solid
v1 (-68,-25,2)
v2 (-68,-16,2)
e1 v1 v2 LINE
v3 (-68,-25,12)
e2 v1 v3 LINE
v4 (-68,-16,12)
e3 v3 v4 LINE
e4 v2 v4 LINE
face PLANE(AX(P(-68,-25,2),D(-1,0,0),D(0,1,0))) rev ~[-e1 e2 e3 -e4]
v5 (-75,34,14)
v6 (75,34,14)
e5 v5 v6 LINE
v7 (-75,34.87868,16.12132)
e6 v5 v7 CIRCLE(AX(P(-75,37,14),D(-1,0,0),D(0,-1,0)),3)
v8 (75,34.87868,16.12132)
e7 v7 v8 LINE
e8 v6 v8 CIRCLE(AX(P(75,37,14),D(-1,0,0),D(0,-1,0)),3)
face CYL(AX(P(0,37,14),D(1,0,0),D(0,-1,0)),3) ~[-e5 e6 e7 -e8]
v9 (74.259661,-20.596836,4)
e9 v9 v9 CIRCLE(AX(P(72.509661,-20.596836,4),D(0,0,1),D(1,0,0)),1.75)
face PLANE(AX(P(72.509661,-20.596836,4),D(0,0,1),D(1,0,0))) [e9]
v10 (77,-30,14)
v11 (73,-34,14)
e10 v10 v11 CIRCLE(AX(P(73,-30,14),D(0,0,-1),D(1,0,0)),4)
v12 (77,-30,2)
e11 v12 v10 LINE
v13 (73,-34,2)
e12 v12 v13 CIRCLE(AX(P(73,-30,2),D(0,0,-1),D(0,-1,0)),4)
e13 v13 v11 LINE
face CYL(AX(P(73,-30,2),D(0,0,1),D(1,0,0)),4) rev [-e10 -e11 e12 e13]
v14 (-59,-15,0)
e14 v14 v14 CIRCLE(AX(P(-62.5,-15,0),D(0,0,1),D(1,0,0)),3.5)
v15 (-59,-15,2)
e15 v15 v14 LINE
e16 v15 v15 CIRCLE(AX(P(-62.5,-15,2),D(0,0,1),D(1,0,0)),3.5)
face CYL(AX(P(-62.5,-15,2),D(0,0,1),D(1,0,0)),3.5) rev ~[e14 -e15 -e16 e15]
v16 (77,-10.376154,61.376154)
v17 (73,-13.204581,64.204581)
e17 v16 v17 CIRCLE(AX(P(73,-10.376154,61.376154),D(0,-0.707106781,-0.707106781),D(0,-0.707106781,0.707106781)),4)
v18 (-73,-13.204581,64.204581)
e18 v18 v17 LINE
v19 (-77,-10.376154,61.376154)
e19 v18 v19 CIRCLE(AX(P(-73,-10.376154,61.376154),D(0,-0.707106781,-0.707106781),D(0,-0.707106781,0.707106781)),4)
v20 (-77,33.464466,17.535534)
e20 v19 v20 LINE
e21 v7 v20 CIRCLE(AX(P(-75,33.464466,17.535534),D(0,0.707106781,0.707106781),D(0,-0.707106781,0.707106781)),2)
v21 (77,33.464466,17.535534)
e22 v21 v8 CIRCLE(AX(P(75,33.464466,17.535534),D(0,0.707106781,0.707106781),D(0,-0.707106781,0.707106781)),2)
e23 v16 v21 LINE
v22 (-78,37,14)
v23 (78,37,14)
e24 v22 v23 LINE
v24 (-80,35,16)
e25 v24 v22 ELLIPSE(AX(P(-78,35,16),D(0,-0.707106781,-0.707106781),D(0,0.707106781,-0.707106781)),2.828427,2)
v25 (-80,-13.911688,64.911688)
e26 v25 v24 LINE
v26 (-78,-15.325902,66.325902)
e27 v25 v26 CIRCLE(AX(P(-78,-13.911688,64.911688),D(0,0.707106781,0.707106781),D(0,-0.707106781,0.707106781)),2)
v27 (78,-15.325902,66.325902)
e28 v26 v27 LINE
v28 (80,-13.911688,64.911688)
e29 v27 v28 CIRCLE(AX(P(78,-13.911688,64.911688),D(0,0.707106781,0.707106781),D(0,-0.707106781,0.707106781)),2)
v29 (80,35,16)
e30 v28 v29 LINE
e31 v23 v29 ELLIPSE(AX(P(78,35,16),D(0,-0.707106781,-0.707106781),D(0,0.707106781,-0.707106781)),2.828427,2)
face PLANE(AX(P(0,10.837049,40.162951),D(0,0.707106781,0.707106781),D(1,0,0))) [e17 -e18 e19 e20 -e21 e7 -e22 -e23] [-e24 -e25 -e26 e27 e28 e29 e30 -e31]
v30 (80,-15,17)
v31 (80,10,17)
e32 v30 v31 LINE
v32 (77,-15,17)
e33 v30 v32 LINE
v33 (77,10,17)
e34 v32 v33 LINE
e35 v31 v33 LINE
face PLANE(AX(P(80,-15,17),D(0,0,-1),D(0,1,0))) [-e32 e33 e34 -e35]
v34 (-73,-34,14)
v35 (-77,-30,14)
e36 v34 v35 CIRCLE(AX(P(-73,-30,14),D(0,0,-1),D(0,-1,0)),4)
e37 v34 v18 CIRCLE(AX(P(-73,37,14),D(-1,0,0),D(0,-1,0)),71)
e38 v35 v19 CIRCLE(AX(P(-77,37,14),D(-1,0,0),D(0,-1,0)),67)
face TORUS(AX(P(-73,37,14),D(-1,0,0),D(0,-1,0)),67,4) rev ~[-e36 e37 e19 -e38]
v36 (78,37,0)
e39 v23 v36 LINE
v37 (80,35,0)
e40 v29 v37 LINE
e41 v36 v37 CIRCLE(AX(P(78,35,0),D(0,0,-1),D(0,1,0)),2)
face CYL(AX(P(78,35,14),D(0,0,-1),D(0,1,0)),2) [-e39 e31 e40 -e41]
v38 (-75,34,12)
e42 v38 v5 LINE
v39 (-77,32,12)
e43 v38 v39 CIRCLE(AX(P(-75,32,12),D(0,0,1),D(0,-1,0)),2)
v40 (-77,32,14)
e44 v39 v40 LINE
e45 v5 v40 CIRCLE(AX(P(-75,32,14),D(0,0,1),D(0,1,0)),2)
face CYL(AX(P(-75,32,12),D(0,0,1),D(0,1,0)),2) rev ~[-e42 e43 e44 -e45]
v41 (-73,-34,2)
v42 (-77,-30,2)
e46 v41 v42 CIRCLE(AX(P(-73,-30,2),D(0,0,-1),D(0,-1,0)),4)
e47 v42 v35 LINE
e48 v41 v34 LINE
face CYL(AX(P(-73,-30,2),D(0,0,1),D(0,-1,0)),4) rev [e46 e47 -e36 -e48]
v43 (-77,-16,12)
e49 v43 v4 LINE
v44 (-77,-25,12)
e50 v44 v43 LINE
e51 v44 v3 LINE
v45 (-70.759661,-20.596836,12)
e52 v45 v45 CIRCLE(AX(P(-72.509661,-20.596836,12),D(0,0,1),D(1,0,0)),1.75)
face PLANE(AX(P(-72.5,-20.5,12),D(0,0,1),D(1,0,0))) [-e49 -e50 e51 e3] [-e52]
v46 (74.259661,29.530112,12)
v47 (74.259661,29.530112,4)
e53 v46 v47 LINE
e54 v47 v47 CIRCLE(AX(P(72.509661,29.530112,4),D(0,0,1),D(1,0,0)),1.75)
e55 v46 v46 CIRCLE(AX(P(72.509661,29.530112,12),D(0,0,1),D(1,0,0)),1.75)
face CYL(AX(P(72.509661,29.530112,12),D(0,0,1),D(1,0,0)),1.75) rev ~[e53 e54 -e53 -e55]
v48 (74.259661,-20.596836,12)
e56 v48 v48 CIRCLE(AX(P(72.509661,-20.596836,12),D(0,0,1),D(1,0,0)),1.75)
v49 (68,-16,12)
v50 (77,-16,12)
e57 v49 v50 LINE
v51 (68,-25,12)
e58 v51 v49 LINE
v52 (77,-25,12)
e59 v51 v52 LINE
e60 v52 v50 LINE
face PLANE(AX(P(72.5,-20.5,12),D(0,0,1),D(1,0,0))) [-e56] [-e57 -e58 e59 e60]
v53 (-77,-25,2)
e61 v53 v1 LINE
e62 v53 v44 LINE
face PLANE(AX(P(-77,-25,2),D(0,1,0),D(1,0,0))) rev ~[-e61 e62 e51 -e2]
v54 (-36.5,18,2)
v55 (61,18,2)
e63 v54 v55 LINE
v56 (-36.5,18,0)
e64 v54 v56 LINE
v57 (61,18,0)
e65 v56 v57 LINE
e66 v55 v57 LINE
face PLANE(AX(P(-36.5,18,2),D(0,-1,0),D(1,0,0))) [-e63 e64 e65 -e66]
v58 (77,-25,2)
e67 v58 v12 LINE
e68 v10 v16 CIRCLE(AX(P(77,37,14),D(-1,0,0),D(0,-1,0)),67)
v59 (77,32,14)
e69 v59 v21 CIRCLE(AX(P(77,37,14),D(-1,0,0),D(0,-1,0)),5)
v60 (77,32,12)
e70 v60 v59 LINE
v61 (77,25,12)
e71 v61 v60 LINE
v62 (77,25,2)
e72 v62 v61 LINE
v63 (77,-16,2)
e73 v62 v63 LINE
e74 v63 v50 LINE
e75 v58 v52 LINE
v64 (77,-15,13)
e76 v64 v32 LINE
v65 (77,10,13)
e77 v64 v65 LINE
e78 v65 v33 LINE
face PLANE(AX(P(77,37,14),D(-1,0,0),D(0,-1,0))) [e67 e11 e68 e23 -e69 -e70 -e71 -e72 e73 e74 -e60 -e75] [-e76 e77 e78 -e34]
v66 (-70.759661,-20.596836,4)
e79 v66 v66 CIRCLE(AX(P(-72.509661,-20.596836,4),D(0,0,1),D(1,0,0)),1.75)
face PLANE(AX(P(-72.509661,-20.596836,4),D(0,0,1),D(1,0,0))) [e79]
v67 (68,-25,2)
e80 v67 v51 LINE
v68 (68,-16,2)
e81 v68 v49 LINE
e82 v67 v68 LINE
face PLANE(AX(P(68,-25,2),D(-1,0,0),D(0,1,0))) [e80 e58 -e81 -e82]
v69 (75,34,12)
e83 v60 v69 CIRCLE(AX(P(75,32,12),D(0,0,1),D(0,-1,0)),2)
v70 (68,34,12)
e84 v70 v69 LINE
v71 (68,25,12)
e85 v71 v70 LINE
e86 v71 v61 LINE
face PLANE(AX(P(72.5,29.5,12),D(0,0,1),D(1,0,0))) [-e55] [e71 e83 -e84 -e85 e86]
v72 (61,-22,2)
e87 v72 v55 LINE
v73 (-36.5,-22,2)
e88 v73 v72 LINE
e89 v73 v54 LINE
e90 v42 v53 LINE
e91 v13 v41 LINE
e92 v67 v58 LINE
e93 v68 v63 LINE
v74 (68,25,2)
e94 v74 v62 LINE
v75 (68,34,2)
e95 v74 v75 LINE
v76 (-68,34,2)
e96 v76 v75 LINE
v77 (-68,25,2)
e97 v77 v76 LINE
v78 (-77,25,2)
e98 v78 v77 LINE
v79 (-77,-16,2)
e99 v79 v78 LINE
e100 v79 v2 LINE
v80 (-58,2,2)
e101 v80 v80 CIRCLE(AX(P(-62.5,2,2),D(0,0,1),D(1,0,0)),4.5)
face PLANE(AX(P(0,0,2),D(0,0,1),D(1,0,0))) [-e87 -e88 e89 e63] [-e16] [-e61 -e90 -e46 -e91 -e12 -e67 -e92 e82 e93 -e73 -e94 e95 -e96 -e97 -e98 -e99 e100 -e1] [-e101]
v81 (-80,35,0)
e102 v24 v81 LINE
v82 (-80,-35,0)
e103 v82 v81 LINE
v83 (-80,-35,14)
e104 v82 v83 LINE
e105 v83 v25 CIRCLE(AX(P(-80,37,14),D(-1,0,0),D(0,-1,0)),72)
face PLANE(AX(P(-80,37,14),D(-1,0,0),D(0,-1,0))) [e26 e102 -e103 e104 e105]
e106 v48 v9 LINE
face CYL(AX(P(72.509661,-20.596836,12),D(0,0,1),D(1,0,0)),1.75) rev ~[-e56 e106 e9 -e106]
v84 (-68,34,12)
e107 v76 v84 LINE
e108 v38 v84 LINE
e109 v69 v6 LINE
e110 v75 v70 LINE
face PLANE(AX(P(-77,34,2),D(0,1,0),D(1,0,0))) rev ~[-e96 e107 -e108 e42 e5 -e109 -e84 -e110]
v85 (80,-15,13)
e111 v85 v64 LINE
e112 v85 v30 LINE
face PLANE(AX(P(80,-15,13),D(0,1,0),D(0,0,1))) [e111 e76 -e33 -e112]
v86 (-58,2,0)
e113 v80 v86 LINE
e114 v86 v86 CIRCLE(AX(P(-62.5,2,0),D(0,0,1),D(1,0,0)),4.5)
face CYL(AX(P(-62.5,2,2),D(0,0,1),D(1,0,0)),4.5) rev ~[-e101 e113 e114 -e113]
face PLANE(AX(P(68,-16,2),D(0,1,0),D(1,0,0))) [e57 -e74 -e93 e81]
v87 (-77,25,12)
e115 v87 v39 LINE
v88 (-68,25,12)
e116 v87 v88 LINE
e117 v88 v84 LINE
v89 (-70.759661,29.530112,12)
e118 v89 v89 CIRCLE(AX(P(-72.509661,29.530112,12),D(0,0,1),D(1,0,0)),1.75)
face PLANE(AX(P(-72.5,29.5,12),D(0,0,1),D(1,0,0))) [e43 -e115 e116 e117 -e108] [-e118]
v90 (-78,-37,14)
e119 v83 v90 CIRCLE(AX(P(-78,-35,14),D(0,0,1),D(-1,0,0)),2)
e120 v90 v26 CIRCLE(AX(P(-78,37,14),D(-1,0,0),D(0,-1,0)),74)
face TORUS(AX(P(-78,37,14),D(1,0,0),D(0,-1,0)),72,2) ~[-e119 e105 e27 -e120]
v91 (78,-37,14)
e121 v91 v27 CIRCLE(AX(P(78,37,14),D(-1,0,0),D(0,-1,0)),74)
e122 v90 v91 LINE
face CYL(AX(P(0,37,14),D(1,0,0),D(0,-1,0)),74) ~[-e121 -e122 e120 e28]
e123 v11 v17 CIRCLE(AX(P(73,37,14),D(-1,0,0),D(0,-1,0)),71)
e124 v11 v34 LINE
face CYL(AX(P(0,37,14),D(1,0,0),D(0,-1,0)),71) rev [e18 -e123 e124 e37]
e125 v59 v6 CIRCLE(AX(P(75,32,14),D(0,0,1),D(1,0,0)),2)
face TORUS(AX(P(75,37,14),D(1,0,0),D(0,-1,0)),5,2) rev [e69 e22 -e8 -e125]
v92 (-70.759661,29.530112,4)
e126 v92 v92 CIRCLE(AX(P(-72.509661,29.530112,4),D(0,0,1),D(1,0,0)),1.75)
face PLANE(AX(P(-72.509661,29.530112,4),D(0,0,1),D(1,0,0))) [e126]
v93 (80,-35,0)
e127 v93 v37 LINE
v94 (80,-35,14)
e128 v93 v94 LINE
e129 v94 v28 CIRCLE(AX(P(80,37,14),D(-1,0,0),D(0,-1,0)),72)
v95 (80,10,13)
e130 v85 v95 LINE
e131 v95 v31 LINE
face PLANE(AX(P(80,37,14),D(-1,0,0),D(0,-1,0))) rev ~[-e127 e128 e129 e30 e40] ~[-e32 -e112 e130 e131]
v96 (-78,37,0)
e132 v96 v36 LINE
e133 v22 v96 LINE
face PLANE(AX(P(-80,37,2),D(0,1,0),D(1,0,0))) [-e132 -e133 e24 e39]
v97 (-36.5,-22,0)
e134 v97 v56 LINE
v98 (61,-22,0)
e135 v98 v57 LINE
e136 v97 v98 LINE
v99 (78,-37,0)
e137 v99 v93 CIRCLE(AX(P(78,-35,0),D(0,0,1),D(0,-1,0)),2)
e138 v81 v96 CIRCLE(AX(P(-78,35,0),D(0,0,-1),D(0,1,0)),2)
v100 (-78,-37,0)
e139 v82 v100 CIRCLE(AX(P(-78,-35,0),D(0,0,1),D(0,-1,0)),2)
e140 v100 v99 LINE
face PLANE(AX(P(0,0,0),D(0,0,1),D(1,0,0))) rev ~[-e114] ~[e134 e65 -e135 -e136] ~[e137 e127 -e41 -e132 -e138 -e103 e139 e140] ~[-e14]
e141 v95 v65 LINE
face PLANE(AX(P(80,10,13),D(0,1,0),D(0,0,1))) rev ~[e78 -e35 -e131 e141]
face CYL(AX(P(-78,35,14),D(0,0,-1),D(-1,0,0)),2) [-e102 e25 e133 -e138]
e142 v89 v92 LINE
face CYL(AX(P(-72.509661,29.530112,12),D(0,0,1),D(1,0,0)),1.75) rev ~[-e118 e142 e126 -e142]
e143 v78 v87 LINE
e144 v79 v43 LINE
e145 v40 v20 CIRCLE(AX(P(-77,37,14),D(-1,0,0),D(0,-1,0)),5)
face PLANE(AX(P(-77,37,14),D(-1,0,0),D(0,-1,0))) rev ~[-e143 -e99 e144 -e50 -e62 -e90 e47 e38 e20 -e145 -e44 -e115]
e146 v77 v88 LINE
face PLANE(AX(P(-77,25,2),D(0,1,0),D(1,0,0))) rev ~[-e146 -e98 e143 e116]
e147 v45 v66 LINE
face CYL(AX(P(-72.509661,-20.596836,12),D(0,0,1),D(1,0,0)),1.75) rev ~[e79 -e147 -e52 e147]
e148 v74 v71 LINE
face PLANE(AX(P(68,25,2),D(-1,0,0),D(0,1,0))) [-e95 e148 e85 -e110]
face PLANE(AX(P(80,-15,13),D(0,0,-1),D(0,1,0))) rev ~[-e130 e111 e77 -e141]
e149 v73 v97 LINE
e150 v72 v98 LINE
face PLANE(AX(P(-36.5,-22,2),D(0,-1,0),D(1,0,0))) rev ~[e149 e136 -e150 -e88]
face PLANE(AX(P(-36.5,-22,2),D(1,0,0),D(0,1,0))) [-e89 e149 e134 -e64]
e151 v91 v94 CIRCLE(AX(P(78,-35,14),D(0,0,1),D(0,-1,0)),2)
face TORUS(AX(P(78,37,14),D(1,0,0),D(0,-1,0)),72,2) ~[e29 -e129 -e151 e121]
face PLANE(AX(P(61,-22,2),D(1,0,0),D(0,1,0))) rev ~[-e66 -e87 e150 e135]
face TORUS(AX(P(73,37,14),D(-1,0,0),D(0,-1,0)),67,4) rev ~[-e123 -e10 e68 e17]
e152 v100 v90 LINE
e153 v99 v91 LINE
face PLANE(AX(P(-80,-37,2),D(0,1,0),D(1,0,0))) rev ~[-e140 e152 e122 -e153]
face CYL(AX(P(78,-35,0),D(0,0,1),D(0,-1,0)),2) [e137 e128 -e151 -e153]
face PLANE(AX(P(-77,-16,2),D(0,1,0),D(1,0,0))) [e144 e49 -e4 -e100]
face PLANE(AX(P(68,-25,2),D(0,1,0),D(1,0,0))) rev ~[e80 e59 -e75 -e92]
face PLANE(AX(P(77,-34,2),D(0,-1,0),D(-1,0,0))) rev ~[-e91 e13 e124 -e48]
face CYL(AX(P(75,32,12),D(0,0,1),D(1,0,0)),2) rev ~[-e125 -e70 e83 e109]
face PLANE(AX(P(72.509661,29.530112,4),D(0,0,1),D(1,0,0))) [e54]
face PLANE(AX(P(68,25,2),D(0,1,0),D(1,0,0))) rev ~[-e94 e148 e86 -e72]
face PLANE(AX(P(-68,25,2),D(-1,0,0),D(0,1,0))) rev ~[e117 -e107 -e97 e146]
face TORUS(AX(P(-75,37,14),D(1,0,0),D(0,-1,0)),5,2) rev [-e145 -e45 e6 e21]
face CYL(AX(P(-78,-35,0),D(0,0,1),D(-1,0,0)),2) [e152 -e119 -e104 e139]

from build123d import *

# Parameters (mm, degrees)
F0_W        = 160
F0_H        = 74
F1_DEPTH    = 2
F2_W        = 97.5
F2_H        = 40
F2_R        = 4.5
F2_R_2      = 3.5
F3_DEPTH    = 2
F4_W        = 9
F4_H        = 9
F5_DEPTH    = 10
F6_R        = 1.75
F7_DEPTH    = 8
F8_W        = 160
F8_H        = 74
F9_DEPTH    = 12
F9_FACE_W   = 160
F9_FACE_H   = 74
F9_FACE_W_2 = 154
F9_FACE_H_2 = 68
F10_ANGLE   = 45
F11_W       = 25
F11_H       = 4
F12_DEPTH   = 3
F13_R       = 2
F14_R       = 4


# Not quite as in the source:
# - a feature names something its author has since deleted; it is built from what else it names


with BuildPart() as f1:
    # F0 (on Top) → F1 (new body)
    with BuildSketch(Plane.XY):
        Rectangle(F0_W, F0_H)
    extrude(amount=F1_DEPTH)

    # F2 (on face) → F3 (cut)
    with BuildSketch(Plane.XY.offset(2)):
        with Locations((12.25, -2)):
            Rectangle(F2_W, F2_H)
        with Locations((-62.5, 2)):
            Circle(F2_R)
        with Locations((-62.5, -15)):
            Circle(F2_R_2)
    extrude(amount=-F3_DEPTH, mode=Mode.SUBTRACT)

    # F4 (on face) → F5 (join)
    with BuildSketch(Plane.XY.offset(2)):
        with Locations((72.5, 29.5)):
            Rectangle(F4_W, F4_H)
        with Locations((-72.5, 29.5)):
            Rectangle(F4_W, F4_H)
        with Locations((-72.5, -20.5)):
            Rectangle(F4_W, F4_H)
        with Locations((72.5, -20.5)):
            Rectangle(F4_W, F4_H)
    extrude(amount=F5_DEPTH)

    # F6 (on face) → F7 (cut)
    with BuildSketch(Plane.XY.offset(12)):
        with Locations((-72.5096613169, 29.5301117003)):
            Circle(F6_R)
        with Locations((-72.5096613169, -20.5968357623)):
            Circle(F6_R)
        with Locations((72.5096613169, 29.5301117003)):
            Circle(F6_R)
        with Locations((72.5096613169, -20.5968357623)):
            Circle(F6_R)
    extrude(amount=-F7_DEPTH, mode=Mode.SUBTRACT)

    # F8 (on face) → F9 (join)
    with BuildSketch(Plane.XY.offset(2)):
        Rectangle(F8_W, F8_H)
        Polygon((-77, 25), (-77, 34), (-68, 34), (68, 34), (77, 34), (77, 25), (77, -16), (77, -25), (77, -34), (-77, -34), (-77, -25), (-77, -16), align=None, mode=Mode.SUBTRACT)
    extrude(amount=F9_DEPTH)

    # F9_face (on face) → F10 (revolve)
    with BuildSketch(Plane.XY.offset(14)):
        Rectangle(F9_FACE_W, F9_FACE_H)
        Rectangle(F9_FACE_W_2, F9_FACE_H_2, mode=Mode.SUBTRACT)
    revolve(axis=Axis((0, 37, 14), (-1, 0, 0)), revolution_arc=F10_ANGLE)

    # F11 (on face) → F12 (cut)
    with BuildSketch(Plane.YZ.offset(80)):
        with Locations((-2.5, 15)):
            Rectangle(F11_W, F11_H)
    extrude(amount=-F12_DEPTH, mode=Mode.SUBTRACT)

    # F13
    f13_edges = [f1.edges().sort_by_distance(p)[0] for p in [
        (80, 37, 7),
        (80, -31.367085, 42.318574),
        (80, -37, 7),
        (-80, 37, 7),
        (-80, -31.367085, 42.318574),
        (-80, -37, 7),
        (-77, 34.228361, 15.14805),
        (77, 34.228361, 15.14805),
    ]]
    fillet(f13_edges, radius=F13_R)

    # F14
    f14_edges = [f1.edges().sort_by_distance(p)[0] for p in [
        (-77, -28.595447, 41.170524),
        (77, -28.595447, 41.170524),
    ]]
    fillet(f14_edges, radius=F14_R)


solid = f1.part
